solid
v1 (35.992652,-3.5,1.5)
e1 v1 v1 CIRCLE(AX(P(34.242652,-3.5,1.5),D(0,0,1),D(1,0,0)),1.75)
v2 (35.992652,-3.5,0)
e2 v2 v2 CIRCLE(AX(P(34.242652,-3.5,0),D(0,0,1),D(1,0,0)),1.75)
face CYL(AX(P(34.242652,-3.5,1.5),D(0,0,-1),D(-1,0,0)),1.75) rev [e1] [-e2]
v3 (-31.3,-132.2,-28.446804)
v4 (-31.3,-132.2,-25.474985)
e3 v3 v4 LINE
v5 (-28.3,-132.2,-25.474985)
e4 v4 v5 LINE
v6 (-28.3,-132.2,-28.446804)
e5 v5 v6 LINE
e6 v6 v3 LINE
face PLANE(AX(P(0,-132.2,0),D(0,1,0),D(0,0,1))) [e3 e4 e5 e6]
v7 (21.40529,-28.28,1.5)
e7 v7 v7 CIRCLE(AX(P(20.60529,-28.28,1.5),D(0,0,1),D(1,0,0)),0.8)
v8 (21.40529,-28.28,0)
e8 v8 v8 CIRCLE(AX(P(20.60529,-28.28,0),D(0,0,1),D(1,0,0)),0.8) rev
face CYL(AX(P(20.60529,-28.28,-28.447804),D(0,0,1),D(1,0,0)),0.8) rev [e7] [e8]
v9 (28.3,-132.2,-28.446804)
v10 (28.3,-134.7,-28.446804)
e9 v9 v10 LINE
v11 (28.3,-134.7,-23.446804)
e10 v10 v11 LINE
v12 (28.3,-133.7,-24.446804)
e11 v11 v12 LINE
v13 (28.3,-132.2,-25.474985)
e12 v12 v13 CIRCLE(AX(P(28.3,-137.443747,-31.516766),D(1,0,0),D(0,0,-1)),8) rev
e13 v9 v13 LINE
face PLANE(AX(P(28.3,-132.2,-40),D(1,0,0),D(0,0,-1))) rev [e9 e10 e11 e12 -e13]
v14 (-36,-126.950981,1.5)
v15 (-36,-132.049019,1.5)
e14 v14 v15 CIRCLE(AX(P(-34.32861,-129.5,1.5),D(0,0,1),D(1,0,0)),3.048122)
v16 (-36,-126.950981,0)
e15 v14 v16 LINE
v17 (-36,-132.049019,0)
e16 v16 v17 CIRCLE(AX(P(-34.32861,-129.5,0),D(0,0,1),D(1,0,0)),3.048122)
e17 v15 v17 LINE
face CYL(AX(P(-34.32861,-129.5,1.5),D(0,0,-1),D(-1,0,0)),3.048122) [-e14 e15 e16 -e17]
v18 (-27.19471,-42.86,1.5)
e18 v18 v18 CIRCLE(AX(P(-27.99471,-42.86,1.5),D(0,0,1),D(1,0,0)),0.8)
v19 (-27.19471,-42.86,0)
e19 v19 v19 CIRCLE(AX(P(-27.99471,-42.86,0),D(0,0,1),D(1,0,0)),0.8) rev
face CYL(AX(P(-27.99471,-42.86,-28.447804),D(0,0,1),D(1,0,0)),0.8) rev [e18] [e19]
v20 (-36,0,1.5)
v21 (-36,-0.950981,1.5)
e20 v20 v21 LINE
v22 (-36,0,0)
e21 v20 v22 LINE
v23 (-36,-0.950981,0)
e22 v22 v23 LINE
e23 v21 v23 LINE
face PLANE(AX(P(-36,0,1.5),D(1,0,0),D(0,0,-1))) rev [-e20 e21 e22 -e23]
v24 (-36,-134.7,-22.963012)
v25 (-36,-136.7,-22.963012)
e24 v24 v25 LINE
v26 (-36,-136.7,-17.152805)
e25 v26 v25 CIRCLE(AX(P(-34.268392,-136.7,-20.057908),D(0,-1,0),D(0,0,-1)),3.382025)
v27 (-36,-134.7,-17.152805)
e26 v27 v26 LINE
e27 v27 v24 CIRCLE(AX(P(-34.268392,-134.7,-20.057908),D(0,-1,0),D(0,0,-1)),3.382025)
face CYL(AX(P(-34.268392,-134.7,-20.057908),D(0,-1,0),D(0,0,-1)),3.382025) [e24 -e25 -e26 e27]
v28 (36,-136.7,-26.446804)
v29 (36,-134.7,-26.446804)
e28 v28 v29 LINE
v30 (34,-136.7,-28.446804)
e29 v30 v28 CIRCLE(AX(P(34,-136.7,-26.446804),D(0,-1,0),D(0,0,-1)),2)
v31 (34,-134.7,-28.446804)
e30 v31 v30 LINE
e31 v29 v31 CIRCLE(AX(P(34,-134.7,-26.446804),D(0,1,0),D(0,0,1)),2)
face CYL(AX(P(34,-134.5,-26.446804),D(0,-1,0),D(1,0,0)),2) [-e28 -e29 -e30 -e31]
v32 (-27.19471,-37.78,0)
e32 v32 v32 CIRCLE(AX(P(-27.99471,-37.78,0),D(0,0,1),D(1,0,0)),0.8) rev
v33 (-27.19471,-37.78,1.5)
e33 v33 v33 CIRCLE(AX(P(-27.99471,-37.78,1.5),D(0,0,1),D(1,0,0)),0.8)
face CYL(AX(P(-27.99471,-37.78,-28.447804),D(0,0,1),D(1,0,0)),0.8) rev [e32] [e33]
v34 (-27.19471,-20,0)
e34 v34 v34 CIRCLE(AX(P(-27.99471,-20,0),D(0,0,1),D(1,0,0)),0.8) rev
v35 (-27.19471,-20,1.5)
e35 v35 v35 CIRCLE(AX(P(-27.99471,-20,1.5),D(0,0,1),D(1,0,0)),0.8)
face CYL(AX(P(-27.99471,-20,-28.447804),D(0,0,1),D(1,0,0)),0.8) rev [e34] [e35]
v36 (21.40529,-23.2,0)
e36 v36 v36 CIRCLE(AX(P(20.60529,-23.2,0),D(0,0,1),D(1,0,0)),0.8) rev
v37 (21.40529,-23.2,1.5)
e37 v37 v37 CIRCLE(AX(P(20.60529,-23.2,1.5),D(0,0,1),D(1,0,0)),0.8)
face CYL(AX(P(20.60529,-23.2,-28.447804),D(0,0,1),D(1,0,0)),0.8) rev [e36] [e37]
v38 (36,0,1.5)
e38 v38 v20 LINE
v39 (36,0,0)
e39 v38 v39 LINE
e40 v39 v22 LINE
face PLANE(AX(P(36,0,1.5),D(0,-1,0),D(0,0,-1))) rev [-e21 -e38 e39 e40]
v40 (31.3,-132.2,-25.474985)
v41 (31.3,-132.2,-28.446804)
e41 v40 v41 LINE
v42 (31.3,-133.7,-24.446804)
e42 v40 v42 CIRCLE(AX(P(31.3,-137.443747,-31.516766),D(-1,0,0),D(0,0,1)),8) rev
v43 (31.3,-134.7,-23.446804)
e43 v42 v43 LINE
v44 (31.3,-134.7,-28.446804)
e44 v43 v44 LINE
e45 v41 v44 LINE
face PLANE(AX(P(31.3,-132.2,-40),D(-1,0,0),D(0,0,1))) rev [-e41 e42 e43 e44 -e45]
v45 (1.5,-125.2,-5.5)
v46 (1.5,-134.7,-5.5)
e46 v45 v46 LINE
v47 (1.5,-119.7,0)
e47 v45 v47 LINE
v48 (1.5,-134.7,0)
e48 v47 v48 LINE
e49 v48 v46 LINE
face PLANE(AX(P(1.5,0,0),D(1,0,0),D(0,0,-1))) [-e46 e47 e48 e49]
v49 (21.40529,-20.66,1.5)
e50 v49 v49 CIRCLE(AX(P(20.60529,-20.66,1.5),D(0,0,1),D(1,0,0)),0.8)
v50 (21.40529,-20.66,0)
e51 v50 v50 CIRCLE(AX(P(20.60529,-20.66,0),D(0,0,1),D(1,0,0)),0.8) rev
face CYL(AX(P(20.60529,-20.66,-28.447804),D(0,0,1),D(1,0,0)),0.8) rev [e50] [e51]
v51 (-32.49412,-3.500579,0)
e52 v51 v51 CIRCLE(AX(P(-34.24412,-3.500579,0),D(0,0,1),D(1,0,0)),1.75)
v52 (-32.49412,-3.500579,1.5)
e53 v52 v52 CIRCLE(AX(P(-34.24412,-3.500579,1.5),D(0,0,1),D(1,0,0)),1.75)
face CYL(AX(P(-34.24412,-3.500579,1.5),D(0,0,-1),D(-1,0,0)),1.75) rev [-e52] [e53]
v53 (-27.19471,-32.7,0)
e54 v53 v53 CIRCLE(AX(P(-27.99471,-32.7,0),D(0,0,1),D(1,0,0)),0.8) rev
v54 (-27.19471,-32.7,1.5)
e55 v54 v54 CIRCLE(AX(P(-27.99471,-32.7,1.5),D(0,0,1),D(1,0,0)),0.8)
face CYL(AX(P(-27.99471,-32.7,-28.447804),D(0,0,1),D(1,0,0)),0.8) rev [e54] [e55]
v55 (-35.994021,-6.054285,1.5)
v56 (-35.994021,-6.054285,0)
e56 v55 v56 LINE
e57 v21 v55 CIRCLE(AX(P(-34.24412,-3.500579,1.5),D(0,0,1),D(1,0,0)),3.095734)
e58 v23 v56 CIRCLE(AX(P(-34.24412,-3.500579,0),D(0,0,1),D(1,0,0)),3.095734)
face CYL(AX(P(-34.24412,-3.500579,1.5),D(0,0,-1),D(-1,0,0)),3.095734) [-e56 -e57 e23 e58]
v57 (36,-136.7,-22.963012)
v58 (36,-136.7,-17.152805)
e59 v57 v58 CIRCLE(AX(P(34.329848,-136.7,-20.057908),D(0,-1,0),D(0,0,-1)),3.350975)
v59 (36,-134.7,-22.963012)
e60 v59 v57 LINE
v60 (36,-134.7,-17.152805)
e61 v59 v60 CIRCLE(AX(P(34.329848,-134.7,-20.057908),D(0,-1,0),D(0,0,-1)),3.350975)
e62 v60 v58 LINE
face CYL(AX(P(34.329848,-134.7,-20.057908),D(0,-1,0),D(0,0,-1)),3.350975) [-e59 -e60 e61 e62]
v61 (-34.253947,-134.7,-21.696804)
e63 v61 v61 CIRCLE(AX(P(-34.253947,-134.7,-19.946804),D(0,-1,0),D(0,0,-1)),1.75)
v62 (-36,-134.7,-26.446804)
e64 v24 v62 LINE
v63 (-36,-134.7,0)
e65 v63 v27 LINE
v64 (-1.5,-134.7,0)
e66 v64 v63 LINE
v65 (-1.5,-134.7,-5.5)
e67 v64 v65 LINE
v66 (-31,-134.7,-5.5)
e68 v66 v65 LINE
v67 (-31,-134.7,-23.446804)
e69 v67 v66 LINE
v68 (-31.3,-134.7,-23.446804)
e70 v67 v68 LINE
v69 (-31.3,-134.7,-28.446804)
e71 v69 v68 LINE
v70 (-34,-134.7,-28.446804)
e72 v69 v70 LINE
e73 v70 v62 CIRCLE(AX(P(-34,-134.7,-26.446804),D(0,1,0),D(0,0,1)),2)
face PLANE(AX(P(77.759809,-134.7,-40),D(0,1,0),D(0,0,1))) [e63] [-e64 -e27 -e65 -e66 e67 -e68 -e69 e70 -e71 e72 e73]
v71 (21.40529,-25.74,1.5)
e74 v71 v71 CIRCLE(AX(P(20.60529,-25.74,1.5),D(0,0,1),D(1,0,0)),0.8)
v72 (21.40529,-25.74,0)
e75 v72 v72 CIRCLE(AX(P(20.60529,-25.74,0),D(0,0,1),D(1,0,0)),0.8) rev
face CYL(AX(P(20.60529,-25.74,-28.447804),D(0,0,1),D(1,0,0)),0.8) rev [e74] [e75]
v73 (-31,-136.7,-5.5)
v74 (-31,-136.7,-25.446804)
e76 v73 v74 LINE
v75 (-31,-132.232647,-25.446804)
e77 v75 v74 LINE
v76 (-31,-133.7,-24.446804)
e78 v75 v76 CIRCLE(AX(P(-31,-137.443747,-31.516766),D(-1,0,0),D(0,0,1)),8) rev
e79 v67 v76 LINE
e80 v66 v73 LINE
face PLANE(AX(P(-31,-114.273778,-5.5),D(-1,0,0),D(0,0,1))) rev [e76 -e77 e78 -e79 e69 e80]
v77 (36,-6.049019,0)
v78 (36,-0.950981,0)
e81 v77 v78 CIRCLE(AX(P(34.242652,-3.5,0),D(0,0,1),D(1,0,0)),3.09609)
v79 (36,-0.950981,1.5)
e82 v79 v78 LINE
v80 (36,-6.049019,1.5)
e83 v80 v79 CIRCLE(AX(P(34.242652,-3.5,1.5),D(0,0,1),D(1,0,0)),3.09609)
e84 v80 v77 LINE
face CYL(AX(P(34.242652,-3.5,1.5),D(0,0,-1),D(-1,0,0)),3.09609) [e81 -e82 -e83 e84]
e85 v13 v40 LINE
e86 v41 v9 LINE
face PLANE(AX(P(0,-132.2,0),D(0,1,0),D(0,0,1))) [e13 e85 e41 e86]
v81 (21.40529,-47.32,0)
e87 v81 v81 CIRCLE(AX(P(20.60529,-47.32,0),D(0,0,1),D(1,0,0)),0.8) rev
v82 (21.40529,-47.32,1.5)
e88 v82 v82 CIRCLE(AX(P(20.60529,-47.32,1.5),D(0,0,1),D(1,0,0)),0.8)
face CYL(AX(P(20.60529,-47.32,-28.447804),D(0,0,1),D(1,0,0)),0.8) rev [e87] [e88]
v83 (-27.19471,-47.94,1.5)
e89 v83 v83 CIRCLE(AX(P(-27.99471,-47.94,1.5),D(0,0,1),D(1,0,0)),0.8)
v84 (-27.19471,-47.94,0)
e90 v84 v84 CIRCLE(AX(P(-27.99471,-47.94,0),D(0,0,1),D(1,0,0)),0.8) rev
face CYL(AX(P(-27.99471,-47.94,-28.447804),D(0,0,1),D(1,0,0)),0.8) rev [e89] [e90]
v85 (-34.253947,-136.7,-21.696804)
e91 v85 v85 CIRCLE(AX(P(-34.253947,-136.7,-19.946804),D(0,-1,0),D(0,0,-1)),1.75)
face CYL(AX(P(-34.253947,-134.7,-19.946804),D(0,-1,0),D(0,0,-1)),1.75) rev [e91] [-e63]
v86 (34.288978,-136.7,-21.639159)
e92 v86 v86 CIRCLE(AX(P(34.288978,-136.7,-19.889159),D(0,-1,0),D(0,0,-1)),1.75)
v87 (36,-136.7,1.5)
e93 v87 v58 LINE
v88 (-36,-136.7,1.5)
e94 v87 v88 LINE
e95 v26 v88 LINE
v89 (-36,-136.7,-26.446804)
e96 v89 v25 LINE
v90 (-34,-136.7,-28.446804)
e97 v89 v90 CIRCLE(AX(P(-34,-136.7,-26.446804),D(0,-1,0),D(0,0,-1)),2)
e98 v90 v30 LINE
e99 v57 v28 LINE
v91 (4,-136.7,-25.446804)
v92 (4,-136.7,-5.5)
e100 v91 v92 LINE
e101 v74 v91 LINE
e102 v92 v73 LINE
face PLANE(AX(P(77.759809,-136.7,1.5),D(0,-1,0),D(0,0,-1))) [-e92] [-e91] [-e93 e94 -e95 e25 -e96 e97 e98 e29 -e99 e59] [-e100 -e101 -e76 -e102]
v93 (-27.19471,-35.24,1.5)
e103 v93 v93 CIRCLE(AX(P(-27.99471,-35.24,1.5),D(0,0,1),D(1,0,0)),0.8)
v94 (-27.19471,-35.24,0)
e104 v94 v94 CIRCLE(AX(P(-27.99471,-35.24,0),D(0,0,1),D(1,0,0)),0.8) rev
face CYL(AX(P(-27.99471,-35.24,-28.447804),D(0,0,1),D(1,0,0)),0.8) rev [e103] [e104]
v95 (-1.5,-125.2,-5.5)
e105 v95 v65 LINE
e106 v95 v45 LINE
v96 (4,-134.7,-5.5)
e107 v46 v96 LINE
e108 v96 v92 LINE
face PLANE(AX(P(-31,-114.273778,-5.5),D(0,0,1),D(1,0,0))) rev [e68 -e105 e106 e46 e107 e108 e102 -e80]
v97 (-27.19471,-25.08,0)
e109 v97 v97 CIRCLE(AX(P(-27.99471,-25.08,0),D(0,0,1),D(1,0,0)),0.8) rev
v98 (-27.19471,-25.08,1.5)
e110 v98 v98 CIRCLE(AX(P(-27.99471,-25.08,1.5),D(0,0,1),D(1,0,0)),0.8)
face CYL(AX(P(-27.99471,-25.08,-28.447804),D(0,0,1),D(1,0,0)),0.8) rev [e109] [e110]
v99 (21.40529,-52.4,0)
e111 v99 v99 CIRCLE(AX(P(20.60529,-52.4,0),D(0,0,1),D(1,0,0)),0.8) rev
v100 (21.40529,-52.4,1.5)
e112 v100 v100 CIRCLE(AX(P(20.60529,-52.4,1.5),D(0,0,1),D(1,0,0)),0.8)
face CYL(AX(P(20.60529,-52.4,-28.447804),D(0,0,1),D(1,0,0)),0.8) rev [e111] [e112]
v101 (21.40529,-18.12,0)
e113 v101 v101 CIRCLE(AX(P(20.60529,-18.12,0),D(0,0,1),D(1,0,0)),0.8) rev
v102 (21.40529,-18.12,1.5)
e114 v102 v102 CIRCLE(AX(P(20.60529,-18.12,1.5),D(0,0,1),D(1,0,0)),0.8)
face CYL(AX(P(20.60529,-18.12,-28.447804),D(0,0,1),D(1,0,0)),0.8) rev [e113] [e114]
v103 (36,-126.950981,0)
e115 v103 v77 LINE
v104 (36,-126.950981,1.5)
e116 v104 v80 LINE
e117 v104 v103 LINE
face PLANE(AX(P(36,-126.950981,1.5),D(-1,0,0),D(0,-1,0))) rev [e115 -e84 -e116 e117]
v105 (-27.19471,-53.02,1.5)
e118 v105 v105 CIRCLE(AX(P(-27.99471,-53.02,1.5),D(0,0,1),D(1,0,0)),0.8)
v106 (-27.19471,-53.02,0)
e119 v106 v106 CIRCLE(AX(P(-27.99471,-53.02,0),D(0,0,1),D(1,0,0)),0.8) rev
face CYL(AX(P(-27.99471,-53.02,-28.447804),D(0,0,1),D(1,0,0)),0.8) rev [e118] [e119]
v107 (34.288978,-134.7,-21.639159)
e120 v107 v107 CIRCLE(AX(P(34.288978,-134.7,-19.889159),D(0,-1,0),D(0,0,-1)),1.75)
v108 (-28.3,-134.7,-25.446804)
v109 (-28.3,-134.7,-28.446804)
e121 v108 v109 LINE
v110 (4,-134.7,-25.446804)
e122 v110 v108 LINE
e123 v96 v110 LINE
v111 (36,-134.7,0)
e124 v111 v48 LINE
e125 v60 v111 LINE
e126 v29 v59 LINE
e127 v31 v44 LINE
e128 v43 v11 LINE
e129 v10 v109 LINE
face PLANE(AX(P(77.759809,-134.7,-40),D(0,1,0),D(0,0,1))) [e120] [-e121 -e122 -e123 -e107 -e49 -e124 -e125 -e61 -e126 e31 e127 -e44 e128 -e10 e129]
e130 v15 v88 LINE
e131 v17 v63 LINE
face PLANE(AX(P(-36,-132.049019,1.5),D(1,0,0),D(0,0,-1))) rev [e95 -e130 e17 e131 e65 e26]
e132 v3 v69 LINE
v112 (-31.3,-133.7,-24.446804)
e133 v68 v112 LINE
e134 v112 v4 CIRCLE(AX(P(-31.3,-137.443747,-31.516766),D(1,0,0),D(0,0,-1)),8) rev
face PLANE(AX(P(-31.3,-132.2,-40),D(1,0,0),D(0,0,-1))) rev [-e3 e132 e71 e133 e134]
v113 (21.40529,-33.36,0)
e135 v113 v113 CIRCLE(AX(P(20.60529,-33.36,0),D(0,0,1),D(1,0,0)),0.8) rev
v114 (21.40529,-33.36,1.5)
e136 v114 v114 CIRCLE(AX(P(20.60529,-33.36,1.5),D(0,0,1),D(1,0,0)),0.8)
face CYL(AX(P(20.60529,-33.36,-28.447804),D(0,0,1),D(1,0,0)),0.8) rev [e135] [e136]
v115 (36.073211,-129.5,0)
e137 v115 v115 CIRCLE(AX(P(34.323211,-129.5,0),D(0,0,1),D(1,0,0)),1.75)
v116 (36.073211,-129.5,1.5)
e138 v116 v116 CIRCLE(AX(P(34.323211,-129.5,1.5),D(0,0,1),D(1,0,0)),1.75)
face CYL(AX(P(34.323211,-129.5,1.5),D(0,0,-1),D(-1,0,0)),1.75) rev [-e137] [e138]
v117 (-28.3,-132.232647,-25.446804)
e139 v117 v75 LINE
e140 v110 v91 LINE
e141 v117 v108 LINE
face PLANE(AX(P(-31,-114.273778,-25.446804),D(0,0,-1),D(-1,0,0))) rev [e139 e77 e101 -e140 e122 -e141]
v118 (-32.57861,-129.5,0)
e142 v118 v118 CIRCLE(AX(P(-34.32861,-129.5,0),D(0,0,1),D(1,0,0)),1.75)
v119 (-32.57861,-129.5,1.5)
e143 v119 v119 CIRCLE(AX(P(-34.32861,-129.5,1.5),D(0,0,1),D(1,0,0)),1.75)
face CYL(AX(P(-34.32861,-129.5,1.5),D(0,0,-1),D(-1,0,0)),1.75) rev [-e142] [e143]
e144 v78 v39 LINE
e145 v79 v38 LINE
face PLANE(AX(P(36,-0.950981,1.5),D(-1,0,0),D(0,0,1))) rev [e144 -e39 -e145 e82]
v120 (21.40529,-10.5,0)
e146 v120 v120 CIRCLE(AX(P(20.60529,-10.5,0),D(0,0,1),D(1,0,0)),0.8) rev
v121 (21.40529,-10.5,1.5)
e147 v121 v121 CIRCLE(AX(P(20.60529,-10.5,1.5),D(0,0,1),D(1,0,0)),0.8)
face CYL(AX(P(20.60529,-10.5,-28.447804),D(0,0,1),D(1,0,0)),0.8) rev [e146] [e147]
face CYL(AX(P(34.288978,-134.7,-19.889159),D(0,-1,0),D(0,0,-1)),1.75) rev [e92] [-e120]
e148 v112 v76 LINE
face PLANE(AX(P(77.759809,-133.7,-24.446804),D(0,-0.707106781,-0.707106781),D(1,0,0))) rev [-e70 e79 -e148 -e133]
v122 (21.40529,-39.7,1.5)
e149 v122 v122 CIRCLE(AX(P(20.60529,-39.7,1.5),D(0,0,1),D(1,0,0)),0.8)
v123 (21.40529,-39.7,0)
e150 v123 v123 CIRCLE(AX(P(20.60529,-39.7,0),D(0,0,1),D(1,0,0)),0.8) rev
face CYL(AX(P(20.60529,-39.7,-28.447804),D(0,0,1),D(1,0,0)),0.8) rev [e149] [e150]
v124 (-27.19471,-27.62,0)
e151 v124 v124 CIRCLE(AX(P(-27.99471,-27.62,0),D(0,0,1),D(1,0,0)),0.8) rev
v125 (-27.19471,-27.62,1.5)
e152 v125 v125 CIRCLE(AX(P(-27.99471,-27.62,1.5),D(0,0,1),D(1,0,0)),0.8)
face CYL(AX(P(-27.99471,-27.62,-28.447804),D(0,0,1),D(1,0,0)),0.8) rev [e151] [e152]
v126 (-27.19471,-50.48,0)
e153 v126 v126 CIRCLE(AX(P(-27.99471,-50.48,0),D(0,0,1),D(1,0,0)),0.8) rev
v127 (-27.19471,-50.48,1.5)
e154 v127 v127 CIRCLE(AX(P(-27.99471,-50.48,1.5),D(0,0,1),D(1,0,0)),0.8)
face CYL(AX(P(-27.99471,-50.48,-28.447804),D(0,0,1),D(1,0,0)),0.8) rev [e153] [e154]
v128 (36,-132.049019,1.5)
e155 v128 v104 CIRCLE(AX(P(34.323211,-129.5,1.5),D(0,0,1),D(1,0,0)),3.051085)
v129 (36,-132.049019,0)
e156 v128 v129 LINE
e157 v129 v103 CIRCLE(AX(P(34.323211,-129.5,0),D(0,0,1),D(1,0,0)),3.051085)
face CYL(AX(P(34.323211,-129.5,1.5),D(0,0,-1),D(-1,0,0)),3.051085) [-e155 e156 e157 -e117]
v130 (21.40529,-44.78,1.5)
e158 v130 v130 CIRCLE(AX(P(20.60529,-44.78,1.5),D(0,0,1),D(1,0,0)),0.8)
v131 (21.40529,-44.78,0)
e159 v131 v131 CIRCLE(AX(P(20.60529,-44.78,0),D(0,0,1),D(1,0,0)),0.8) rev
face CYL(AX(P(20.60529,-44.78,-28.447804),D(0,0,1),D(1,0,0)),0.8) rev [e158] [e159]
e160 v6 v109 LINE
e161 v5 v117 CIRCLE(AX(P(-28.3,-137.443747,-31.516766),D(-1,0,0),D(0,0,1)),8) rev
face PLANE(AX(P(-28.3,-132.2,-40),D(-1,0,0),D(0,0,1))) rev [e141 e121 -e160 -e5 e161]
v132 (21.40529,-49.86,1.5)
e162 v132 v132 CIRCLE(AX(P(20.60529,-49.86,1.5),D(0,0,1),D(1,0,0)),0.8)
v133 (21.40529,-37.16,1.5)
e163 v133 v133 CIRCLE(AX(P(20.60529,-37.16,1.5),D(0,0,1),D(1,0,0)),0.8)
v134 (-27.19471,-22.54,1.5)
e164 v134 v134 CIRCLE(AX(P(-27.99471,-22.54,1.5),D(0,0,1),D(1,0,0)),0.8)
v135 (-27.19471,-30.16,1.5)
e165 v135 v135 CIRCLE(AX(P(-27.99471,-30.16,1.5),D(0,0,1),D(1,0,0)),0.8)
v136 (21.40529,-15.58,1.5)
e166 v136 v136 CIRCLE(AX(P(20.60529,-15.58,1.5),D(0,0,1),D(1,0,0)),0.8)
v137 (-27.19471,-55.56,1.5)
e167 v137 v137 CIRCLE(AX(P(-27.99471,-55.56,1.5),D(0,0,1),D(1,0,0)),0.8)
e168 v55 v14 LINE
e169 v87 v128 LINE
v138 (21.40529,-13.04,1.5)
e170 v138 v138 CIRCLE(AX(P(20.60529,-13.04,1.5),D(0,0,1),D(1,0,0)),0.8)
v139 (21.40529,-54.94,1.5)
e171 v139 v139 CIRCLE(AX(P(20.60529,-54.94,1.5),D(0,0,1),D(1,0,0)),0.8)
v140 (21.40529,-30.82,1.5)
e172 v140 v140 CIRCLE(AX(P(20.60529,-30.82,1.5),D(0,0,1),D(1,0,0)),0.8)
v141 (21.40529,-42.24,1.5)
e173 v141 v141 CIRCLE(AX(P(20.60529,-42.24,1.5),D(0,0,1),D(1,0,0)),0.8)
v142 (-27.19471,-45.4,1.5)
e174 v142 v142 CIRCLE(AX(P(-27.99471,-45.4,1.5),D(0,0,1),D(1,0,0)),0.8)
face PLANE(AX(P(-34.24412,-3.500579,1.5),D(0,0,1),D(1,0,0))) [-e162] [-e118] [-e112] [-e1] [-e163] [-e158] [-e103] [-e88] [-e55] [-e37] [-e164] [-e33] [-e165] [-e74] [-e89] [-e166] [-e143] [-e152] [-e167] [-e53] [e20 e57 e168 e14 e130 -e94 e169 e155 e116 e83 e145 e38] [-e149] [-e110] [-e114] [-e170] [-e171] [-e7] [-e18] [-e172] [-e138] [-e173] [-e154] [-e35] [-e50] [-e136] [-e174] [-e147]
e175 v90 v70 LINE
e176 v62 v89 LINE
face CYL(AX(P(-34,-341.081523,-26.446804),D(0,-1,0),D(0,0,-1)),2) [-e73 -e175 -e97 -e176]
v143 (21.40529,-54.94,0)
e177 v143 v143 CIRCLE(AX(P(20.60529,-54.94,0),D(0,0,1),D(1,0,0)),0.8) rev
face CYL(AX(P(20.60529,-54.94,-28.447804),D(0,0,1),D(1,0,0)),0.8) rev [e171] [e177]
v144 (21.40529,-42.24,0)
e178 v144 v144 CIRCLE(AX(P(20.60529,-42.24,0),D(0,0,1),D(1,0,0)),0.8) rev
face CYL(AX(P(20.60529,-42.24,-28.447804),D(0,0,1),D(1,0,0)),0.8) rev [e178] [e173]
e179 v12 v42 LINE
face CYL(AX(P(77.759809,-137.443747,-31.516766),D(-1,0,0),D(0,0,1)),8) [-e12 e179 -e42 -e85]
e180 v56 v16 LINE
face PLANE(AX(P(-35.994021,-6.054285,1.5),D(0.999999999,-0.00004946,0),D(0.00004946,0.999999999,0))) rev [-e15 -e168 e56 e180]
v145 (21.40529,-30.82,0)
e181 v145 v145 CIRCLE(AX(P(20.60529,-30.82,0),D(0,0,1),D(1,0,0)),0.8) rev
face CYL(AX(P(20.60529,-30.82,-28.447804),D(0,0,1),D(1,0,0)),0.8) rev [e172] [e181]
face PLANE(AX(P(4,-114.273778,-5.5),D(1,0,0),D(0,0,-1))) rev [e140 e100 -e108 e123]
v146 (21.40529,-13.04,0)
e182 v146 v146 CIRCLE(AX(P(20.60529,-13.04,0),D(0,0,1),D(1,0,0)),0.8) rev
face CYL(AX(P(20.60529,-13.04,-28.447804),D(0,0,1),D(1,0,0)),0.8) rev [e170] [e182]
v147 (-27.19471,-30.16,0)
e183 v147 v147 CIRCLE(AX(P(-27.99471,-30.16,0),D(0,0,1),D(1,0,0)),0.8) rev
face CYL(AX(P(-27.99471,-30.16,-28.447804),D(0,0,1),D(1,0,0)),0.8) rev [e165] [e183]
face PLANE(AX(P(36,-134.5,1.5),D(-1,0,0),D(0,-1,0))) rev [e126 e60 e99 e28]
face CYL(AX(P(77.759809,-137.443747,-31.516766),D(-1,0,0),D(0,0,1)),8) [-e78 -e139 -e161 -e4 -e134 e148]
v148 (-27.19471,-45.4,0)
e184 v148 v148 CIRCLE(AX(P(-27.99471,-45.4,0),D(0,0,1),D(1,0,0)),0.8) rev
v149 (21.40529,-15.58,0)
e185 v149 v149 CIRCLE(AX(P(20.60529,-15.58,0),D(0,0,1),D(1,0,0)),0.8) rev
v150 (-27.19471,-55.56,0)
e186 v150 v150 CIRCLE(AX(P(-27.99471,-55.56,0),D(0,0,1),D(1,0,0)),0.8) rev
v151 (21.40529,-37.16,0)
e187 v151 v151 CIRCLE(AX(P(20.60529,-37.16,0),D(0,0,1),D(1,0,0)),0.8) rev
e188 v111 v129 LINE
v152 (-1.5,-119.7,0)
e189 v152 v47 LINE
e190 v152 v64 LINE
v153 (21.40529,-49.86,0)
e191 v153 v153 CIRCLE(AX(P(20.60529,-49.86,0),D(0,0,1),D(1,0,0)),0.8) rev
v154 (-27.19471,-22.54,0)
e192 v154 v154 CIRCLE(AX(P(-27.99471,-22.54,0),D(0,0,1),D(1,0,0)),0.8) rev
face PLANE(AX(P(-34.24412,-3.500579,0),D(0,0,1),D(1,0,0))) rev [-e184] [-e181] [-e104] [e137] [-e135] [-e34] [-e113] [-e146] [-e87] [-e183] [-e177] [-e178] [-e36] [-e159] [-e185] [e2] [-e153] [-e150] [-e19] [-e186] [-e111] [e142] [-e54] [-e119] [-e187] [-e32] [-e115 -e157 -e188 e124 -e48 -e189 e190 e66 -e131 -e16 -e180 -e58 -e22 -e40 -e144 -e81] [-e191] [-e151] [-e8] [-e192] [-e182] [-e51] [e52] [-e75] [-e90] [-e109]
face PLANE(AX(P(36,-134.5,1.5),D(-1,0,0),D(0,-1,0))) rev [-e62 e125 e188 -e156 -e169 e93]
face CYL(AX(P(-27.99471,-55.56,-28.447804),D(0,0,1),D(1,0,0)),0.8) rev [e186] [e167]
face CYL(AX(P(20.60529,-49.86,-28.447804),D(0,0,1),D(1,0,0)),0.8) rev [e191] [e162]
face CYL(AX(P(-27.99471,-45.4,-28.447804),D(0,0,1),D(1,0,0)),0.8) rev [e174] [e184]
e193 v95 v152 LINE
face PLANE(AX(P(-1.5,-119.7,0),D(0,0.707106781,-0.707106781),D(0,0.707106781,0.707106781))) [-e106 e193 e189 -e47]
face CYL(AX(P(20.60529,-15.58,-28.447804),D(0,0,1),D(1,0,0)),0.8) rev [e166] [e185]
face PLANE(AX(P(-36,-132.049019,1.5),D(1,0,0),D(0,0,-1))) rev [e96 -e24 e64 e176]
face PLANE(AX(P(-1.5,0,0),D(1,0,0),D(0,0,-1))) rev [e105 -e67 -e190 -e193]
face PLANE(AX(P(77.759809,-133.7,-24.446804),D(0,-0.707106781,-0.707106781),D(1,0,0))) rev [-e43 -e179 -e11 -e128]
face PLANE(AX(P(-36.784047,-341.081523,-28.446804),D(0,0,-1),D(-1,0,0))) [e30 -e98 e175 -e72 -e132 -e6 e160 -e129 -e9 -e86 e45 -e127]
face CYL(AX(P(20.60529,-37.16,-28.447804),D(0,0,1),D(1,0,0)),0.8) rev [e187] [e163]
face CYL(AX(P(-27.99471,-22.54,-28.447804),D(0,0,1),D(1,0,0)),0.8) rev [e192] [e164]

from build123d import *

# Parameters (mm, degrees)
SKETCH1_R                = 1.75
BOSS_EXTRUDE1_DEPTH      = 1.5
BOSS_EXTRUDE2_DEPTH      = 72
BOSS_EXTRUDE3_DEPTH      = 1.5
BOSS_EXTRUDE3_DEPTH_BACK = 1.5
BOSS_EXTRUDE4_DEPTH      = 2
SKETCH5_R                = 1.75
CUT_EXTRUDE1_DEPTH       = 2
CUT_EXTRUDE2_DEPTH       = 148.332054879
CUT_EXTRUDE2_DEPTH_BACK  = 148.332054879
SKETCH6_W                = 72
SKETCH6_H                = 11.553195909
BOSS_EXTRUDE6_START      = -2
SKETCH7_W                = 3
SKETCH7_H                = 4
BOSS_EXTRUDE6_DEPTH      = 2.5
FILLET1_R                = 2
CHAMFER1_SIZE            = 1
FILLET2_R                = 8
SKETCH8_W                = 35
SKETCH8_H                = 19.946804091
CUT_EXTRUDE3_DEPTH       = 22.4262221
SKETCH10_R               = 0.8
CUT_EXTRUDE4_DEPTH       = 1.5


with BuildPart() as part:
    # Sketch1 → Boss-Extrude1 (new body)
    with BuildSketch(Plane.XY):
        with BuildLine():
            Line((-31.5, -134.5), (31.5, -134.5))
            Line((31.5, -134.5), (36, -134.5))
            Line((36, -134.5), (36, -132.049019419))
            ThreePointArc((36, -132.049019419), (37.374296294, -129.5), (36, -126.950980581))
            Line((36, -126.950980581), (36, -6.049019419))
            ThreePointArc((36, -6.049019419), (37.33874188, -3.5), (36, -0.950980581))
            Line((36, -0.950980581), (36, 0))
            Line((36, 0), (-36, 0))
            Line((-36, 0), (-36, -0.950980581))
            ThreePointArc((-36, -0.950980581), (-37.339851511, -3.504206195), (-35.994020506, -6.054285021))
            Line((-35.994020506, -6.054285021), (-36, -126.950980581))
            ThreePointArc((-36, -126.950980581), (-37.376731289, -129.5), (-36, -132.049019419))
            Line((-36, -132.049019419), (-36, -134.5))
            Line((-36, -134.5), (-31.5, -134.5))
        make_face()
        with Locations((-34.328609587, -129.5)):
            Circle(SKETCH1_R, mode=Mode.SUBTRACT)
        with Locations((34.323211043, -129.5)):
            Circle(SKETCH1_R, mode=Mode.SUBTRACT)
        with Locations((34.242652207, -3.5)):
            Circle(SKETCH1_R, mode=Mode.SUBTRACT)
        with Locations((-34.244120111, -3.500578956)):
            Circle(SKETCH1_R, mode=Mode.SUBTRACT)
    extrude(amount=BOSS_EXTRUDE1_DEPTH)

    # Sketch2 → Boss-Extrude2 (add)
    with BuildSketch(Plane.ZY.offset(36)):
        Polygon((1.5, -134.5), (1.5, -136.7), (-40, -136.7), (-40, -134.7), (0, -134.7), (0, -134.5), (0, -132.049019419), (1.5, -132.049019419), align=None)
    extrude(amount=-BOSS_EXTRUDE2_DEPTH)

    # Sketch3 → Boss-Extrude3 (add, two sides: drawn at the far end of the back side and taken through both)
    with BuildSketch(Plane(origin=(0, 0, 0), x_dir=(0, 0, -1), z_dir=(1, 0, 0)).offset(-BOSS_EXTRUDE3_DEPTH_BACK)):
        Polygon((0, -119.7), (15, -134.7), (0, -134.7), align=None)
    extrude(amount=BOSS_EXTRUDE3_DEPTH + BOSS_EXTRUDE3_DEPTH_BACK)

    # Sketch4 → Boss-Extrude4 (add)
    with BuildSketch(Plane.XZ.offset(136.7)):
        with BuildLine():
            Line((-36, -17.152805247), (-36, -22.963011674))
            ThreePointArc((-36, -22.963011674), (-37.650416645, -20.05790846), (-36, -17.152805247))
        make_face()
        with BuildLine():
            Line((36, -17.152805247), (36, -22.963011674))
            ThreePointArc((36, -22.963011674), (37.68082264, -20.05790846), (36, -17.152805247))
        make_face()
    extrude(amount=-BOSS_EXTRUDE4_DEPTH)

    # Sketch5 → Cut-Extrude1 (cut)
    with BuildSketch(Plane.XZ.offset(136.7)):
        with Locations(Location((-34.253947115, -19.946804091, 0), (0, 0, 270))):
            Circle(SKETCH5_R)
        with Locations(Location((34.288977705, -19.889159472, 0), (0, 0, 270))):
            Circle(SKETCH5_R)
    extrude(amount=-CUT_EXTRUDE1_DEPTH, mode=Mode.SUBTRACT)

    # Sketch6 → Cut-Extrude2 (cut, two sides: drawn at the far end of the back side and taken through both)
    with BuildSketch(Plane.XZ.offset(136.7).offset(-CUT_EXTRUDE2_DEPTH_BACK)):
        with Locations((0, -34.223402046)):
            Rectangle(SKETCH6_W, SKETCH6_H)
    extrude(amount=CUT_EXTRUDE2_DEPTH + CUT_EXTRUDE2_DEPTH_BACK, mode=Mode.SUBTRACT)

    # Sketch7 → Boss-Extrude6 (add)
    with BuildSketch(Plane.XZ.offset(136.7).offset(BOSS_EXTRUDE6_START)):
        with Locations((-29.8, -26.446804091)):
            Rectangle(SKETCH7_W, SKETCH7_H)
        with Locations((29.8, -26.446804091)):
            Rectangle(SKETCH7_W, SKETCH7_H)
    extrude(amount=-BOSS_EXTRUDE6_DEPTH)

    # Fillet1
    fillet1_edges = [part.edges().sort_by_distance(p)[0] for p in [
        (36, -135.7, -28.446804091),
        (-36, -135.7, -28.446804091),
    ]]
    fillet(fillet1_edges, radius=FILLET1_R)

    # Chamfer1
    chamfer1_edges = [part.edges().sort_by_distance(p)[0] for p in [
        (-29.8, -134.7, -24.446804091),
        (-29.8, -132.2, -24.446804091),
        (29.8, -134.7, -24.446804091),
        (29.8, -132.2, -24.446804091),
    ]]
    chamfer(chamfer1_edges, length=CHAMFER1_SIZE)

    # Fillet2
    # the kernel refuses this fillet: 8 mm, written as the material it takes off along each edge
    with BuildSketch(Plane(origin=(-23.303909917, -133.2, -24.446804091), x_dir=(0, -1.0, -1.118394266079786e-11), z_dir=(-1, 0, 0))) as fillet2_piece_1:
        with BuildLine():
            CenterArc((4.243746579, -7.06996192), FILLET2_R, 117.902496562, 17.097503438)
            Line((-1.413107671, -1.413107671), (0, 0))
            Line((0, 0), (0.5, 0))
        make_face()
    extrude(amount=12.992180166, mode=Mode.SUBTRACT)
    with BuildSketch(Plane(origin=(23.303909917, -133.2, -24.446804091), x_dir=(0, 0.7071067811865476, -0.7071067811865476), z_dir=(1, 0, 0))) as fillet2_piece_2:
        with BuildLine():
            CenterArc((1.998436033, -8), FILLET2_R, 90, 17.097503438)
            Line((-0.353553391, -0.353553391), (0, 0))
            Line((0, 0), (1.998436033, 0))
        make_face()
    extrude(amount=12.992180166, mode=Mode.SUBTRACT)

    # Sketch8 → Cut-Extrude3 (cut)
    with BuildSketch(Plane.XZ.offset(136.7)):
        with Locations((-13.5, -15.473402046)):
            Rectangle(SKETCH8_W, SKETCH8_H)
    extrude(amount=-CUT_EXTRUDE3_DEPTH, mode=Mode.SUBTRACT)

    # Sketch10 → Cut-Extrude4 (cut)
    with BuildSketch(Plane.XY.offset(1.5)):
        with Locations((-27.994710245, -20)):
            Circle(SKETCH10_R)
        with Locations((-27.994710245, -22.54)):
            Circle(SKETCH10_R)
        with Locations((-27.994710245, -25.08)):
            Circle(SKETCH10_R)
        with Locations((-27.994710245, -27.62)):
            Circle(SKETCH10_R)
        with Locations((-27.994710245, -30.16)):
            Circle(SKETCH10_R)
        with Locations((-27.994710245, -32.7)):
            Circle(SKETCH10_R)
        with Locations((-27.994710245, -35.24)):
            Circle(SKETCH10_R)
        with Locations((-27.994710245, -37.78)):
            Circle(SKETCH10_R)
        with Locations((20.605289755, -10.5)):
            Circle(SKETCH10_R)
        with Locations((-27.994710245, -42.86)):
            Circle(SKETCH10_R)
        with Locations((-27.994710245, -45.4)):
            Circle(SKETCH10_R)
        with Locations((-27.994710245, -47.94)):
            Circle(SKETCH10_R)
        with Locations((-27.994710245, -50.48)):
            Circle(SKETCH10_R)
        with Locations((-27.994710245, -53.02)):
            Circle(SKETCH10_R)
        with Locations((-27.994710245, -55.56)):
            Circle(SKETCH10_R)
        with Locations((20.605289755, -13.04)):
            Circle(SKETCH10_R)
        with Locations((20.605289755, -15.58)):
            Circle(SKETCH10_R)
        with Locations((20.605289755, -18.12)):
            Circle(SKETCH10_R)
        with Locations((20.605289755, -20.66)):
            Circle(SKETCH10_R)
        with Locations((20.605289755, -23.2)):
            Circle(SKETCH10_R)
        with Locations((20.605289755, -25.74)):
            Circle(SKETCH10_R)
        with Locations((20.605289755, -28.28)):
            Circle(SKETCH10_R)
        with Locations((20.605289755, -30.82)):
            Circle(SKETCH10_R)
        with Locations((20.605289755, -33.36)):
            Circle(SKETCH10_R)
        with Locations((20.605289755, -37.16)):
            Circle(SKETCH10_R)
        with Locations((20.605289755, -39.7)):
            Circle(SKETCH10_R)
        with Locations((20.605289755, -42.24)):
            Circle(SKETCH10_R)
        with Locations((20.605289755, -44.78)):
            Circle(SKETCH10_R)
        with Locations((20.605289755, -47.32)):
            Circle(SKETCH10_R)
        with Locations((20.605289755, -49.86)):
            Circle(SKETCH10_R)
        with Locations((20.605289755, -52.4)):
            Circle(SKETCH10_R)
        with Locations((20.605289755, -54.94)):
            Circle(SKETCH10_R)
    extrude(amount=-CUT_EXTRUDE4_DEPTH, mode=Mode.SUBTRACT)


solid = part.part
